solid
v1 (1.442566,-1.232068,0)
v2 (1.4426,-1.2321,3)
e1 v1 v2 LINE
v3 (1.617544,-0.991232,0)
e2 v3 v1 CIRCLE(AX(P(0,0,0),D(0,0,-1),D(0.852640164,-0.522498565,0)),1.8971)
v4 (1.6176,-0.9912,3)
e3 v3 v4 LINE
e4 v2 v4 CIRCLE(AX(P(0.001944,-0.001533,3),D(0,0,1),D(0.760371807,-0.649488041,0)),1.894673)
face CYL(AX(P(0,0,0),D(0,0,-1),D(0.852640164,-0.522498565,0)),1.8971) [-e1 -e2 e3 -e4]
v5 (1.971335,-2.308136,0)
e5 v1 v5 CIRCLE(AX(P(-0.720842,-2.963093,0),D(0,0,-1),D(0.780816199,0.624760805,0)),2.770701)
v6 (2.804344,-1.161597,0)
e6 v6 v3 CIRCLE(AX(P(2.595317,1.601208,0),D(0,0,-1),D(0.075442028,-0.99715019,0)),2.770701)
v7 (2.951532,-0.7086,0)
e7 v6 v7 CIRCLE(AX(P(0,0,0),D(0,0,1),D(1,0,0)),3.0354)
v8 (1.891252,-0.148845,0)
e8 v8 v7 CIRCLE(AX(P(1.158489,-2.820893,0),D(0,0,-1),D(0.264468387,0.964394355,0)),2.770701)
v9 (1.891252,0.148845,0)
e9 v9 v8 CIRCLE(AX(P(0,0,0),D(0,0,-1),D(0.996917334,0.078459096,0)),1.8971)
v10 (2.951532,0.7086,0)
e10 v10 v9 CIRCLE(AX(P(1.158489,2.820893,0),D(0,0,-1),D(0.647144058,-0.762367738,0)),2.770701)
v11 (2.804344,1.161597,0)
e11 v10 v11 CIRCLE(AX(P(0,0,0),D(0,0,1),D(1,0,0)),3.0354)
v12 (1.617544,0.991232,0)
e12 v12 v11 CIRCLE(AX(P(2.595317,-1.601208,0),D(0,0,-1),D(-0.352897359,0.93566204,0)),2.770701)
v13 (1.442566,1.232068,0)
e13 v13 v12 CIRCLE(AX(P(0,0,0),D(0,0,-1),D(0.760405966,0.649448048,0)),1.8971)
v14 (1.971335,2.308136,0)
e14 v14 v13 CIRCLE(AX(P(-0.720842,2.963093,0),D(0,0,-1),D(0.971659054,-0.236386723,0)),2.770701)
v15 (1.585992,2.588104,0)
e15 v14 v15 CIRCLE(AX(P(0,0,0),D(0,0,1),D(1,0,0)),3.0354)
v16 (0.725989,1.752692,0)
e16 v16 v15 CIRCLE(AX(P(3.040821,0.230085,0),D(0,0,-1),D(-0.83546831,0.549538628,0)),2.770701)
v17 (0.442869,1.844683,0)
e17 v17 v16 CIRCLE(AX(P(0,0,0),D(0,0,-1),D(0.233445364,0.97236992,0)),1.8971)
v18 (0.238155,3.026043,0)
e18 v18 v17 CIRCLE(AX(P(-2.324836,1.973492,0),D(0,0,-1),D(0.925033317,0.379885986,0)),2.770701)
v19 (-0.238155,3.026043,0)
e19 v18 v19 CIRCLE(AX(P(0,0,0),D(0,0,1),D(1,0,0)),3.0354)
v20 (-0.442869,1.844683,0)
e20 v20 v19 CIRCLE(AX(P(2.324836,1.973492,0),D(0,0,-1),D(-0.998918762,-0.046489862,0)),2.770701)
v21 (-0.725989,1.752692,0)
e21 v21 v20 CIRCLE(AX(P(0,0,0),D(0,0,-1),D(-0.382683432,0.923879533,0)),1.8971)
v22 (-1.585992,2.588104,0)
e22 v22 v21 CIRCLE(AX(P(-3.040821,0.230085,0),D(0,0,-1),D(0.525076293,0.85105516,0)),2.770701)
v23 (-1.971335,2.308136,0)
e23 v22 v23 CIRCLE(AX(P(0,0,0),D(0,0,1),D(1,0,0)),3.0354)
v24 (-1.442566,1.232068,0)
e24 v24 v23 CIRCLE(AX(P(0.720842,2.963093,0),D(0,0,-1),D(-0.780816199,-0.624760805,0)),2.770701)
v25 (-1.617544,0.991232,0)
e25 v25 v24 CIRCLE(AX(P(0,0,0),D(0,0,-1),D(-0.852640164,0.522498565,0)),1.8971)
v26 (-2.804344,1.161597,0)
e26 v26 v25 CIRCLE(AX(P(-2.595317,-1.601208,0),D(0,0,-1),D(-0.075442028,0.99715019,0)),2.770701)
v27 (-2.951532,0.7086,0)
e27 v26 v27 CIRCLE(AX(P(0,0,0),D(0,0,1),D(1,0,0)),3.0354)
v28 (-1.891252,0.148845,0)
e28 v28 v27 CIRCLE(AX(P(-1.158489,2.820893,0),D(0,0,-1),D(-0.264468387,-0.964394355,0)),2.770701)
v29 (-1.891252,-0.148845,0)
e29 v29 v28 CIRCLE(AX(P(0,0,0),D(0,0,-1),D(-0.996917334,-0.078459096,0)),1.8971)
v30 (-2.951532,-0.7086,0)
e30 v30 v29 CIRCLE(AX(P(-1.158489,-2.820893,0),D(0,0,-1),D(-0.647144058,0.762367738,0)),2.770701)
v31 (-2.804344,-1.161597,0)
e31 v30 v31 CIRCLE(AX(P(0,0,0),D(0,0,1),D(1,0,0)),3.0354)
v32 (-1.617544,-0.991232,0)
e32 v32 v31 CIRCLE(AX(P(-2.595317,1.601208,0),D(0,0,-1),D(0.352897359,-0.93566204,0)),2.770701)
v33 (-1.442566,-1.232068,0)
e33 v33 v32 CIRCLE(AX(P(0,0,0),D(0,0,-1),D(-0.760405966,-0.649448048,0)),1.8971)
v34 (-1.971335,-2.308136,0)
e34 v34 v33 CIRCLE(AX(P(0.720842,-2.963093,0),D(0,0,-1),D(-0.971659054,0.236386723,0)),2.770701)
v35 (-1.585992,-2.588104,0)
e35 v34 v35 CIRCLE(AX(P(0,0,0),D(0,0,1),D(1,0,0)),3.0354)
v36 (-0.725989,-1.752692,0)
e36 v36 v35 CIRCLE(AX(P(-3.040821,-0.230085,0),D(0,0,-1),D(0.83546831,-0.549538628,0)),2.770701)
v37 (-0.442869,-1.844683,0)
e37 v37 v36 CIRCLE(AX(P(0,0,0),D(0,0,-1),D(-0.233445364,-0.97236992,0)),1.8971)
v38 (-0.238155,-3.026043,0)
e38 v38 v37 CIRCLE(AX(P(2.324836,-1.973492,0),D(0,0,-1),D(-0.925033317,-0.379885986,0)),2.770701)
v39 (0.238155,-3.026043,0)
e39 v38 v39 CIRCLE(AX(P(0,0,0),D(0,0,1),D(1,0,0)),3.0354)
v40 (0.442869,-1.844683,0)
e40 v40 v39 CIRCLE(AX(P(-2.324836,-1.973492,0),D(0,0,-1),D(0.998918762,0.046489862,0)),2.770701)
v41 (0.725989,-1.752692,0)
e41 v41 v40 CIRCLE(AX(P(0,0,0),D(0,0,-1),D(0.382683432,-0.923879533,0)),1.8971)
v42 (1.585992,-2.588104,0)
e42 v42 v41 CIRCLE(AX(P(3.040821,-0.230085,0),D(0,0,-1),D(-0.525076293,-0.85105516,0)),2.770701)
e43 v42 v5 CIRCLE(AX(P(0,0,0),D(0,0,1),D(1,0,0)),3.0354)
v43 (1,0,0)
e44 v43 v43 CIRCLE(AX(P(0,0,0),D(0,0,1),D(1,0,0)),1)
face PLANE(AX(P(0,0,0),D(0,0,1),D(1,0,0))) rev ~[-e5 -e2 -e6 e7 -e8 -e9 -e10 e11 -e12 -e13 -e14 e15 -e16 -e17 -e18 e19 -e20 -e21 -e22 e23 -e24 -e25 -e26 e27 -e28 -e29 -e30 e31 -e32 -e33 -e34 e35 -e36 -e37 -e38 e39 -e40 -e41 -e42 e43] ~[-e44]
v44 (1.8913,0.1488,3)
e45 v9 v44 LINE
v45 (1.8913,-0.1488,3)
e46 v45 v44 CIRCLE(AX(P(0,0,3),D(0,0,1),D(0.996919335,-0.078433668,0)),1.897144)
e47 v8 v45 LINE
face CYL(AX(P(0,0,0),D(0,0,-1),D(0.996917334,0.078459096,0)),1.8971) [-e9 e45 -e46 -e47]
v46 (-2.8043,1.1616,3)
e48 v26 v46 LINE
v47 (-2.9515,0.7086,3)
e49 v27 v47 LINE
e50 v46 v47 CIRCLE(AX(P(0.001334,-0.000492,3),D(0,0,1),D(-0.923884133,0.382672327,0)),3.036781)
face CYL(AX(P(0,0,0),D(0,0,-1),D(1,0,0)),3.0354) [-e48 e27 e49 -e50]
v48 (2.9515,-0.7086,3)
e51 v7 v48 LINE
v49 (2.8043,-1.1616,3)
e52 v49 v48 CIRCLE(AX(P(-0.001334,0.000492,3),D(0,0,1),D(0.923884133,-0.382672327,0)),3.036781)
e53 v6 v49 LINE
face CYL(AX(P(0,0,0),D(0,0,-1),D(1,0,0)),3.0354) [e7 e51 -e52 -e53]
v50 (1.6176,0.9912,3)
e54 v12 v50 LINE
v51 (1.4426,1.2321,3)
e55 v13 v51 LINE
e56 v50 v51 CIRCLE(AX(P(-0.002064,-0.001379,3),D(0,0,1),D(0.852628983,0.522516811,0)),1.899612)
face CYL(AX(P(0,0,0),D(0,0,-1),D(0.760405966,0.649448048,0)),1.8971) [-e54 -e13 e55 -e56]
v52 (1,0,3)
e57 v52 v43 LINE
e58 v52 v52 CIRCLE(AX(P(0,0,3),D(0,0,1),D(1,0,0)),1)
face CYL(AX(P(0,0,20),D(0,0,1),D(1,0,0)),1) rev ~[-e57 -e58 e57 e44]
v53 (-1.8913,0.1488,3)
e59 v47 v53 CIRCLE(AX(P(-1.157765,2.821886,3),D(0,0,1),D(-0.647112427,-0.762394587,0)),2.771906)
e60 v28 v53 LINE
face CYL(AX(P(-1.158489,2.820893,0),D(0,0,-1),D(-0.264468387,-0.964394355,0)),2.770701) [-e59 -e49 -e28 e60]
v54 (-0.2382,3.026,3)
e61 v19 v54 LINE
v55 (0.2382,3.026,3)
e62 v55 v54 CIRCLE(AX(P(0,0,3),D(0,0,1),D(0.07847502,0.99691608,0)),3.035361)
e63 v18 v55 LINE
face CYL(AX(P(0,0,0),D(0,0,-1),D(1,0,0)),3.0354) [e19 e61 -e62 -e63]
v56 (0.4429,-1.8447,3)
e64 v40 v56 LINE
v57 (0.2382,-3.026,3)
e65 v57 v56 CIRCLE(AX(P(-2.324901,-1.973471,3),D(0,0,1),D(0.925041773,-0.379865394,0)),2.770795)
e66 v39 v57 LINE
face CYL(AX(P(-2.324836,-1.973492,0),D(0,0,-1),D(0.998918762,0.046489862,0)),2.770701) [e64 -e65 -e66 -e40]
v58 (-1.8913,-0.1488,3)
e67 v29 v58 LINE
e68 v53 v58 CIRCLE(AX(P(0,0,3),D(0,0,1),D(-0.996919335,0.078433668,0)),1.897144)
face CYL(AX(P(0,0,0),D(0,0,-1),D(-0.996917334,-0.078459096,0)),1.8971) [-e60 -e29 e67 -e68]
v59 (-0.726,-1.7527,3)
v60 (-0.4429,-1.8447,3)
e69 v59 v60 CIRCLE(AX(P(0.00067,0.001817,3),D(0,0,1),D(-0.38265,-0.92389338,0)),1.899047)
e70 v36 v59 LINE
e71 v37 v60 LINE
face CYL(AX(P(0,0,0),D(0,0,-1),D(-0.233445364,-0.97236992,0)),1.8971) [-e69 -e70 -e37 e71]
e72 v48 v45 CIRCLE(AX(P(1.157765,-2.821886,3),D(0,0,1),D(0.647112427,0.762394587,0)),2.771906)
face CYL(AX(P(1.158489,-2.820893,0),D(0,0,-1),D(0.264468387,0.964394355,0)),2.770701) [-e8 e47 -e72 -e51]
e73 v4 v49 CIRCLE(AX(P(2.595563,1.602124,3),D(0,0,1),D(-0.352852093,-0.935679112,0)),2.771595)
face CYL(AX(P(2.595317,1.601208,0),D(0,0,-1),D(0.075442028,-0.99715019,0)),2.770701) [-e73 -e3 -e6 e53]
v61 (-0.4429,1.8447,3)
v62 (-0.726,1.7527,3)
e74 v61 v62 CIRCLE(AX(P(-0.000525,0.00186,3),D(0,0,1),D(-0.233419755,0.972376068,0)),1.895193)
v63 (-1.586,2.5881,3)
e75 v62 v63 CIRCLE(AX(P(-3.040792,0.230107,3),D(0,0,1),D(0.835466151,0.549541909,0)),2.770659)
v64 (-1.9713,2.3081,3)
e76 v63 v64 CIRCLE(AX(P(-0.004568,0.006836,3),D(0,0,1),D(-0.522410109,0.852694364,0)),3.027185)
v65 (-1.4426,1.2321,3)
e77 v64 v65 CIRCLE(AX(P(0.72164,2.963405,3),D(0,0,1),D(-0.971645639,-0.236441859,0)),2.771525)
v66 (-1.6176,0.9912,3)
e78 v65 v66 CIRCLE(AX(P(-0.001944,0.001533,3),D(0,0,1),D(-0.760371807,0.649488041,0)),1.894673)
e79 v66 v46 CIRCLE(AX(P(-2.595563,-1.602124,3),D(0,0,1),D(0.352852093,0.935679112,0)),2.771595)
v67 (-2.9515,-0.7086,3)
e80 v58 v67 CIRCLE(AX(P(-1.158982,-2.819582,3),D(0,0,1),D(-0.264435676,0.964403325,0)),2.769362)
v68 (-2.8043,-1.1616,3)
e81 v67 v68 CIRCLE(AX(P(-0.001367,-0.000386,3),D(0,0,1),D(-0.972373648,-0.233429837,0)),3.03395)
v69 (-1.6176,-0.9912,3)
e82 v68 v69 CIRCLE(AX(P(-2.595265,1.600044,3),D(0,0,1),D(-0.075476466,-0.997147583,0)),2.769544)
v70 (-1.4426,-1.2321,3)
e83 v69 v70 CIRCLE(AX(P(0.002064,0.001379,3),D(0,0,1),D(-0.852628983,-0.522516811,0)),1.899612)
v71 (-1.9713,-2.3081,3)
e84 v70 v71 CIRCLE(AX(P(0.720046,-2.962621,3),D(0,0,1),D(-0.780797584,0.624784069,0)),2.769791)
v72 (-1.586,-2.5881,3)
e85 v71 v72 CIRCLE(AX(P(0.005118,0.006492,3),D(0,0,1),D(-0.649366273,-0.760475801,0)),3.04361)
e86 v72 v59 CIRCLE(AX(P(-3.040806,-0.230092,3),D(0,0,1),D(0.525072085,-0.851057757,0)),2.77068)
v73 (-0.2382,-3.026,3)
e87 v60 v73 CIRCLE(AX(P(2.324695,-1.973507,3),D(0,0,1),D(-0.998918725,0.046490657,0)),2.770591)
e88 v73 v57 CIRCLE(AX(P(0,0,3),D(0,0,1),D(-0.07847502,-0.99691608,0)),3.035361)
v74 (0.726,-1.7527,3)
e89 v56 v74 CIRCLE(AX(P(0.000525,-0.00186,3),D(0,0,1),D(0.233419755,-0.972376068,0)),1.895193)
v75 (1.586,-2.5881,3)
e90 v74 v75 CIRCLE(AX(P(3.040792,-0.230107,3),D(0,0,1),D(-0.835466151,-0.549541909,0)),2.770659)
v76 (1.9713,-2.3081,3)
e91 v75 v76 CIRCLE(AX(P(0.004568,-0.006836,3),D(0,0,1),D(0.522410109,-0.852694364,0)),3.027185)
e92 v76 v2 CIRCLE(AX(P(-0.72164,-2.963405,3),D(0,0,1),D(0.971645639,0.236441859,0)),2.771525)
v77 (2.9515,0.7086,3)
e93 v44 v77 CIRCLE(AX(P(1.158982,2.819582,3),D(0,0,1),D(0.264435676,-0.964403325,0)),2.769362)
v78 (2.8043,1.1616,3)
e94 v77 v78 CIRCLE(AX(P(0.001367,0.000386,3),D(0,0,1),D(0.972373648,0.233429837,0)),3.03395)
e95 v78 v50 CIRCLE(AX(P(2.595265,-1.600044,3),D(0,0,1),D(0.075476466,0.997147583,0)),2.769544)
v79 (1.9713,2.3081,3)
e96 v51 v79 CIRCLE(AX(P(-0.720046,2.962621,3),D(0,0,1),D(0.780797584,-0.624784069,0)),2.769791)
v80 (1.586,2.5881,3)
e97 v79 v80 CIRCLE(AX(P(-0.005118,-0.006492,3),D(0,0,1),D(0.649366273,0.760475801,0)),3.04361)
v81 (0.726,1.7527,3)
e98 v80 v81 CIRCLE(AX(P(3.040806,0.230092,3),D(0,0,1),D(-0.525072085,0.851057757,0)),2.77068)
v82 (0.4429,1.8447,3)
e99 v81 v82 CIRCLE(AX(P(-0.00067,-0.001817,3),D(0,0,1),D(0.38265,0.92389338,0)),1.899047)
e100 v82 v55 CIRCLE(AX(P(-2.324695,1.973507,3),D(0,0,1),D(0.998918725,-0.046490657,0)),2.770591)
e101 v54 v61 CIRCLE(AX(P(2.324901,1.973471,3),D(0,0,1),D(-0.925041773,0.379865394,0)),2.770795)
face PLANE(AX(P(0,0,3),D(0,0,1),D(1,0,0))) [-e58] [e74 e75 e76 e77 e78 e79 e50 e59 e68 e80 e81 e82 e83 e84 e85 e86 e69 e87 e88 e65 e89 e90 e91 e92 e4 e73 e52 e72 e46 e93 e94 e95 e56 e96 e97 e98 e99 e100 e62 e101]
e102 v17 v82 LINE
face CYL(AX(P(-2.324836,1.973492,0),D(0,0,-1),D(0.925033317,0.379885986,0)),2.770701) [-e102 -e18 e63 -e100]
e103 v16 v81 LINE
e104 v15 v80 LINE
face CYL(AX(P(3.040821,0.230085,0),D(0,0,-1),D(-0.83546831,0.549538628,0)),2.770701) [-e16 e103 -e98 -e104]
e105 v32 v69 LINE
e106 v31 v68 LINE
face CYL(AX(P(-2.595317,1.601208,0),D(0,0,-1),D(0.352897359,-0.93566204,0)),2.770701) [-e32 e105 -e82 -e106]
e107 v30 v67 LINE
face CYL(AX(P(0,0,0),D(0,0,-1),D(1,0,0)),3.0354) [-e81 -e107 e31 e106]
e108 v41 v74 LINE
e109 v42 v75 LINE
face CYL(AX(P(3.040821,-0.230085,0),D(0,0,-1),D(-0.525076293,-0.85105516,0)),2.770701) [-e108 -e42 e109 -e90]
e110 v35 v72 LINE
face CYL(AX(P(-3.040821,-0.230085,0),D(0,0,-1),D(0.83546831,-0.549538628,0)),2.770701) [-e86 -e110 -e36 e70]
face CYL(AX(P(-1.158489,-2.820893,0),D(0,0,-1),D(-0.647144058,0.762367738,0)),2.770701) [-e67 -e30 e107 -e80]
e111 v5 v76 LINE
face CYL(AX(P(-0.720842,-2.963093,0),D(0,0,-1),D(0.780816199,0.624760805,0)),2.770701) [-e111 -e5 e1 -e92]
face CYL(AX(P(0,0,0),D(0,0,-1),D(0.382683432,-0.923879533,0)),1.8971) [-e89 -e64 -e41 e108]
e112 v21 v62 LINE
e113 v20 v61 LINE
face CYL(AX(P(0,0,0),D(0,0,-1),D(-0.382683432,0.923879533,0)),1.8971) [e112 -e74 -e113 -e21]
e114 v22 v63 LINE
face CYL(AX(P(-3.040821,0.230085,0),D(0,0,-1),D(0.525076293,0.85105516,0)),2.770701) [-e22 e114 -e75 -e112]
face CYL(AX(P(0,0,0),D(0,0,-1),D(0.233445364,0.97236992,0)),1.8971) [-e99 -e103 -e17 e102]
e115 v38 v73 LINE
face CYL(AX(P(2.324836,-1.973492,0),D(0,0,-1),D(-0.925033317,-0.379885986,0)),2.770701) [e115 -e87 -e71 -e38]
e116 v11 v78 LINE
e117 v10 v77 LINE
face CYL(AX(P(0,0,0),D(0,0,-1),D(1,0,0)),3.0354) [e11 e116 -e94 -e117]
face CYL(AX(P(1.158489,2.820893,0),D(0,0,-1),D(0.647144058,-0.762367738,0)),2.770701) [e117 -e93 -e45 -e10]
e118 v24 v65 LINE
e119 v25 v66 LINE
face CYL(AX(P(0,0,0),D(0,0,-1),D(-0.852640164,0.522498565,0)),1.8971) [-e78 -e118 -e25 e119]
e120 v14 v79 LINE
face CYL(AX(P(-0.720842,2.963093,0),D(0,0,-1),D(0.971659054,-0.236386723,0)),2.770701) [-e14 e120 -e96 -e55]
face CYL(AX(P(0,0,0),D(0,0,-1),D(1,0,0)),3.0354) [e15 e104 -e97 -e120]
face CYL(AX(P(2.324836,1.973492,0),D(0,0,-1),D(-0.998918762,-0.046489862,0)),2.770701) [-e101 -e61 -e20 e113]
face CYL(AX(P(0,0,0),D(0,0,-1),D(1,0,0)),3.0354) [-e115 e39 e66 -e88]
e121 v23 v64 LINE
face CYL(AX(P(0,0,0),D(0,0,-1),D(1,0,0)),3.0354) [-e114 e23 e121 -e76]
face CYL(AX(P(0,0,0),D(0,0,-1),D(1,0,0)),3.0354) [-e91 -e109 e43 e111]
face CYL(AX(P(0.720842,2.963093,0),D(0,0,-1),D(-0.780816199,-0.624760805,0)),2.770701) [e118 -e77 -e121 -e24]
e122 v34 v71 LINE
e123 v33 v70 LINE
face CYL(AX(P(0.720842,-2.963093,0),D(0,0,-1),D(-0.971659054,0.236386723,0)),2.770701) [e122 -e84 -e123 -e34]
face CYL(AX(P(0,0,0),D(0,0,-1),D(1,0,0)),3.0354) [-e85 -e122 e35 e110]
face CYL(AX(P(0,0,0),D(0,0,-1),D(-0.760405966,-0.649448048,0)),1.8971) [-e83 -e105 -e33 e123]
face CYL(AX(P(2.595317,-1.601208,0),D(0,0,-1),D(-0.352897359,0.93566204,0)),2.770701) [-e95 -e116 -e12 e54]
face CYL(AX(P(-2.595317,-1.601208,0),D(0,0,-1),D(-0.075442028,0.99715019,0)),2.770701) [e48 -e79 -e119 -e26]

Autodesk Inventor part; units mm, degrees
sketch "Sketch1" plane through (0, 0, 0) normal (0, 0, 1) x (1, 0, 0)
  circle A0 centre (0, 0) radius 3.0354
  dimension "d0" = 6.0708
extrude "Extrusion1" add sketch "Sketch1" along normal blind 20
ref_plane "Work Plane2" through (0, 0, 10) normal (0, 0, 1) x (1, 0, 0)
sketch "Sketch2" plane through (0, 0, 0) normal (0, 0, -1) x (-1, 0, 0)
  circle A0 centre (0, 0) radius 3.0354 projected
  circle A1 centre (0, 0) radius 2.5295
  dimension "d3" = 5.059
surface extrude "Pitch Diameter" sketch "Sketch2" against normal through all shown no curves A1
ref_plane "Work Plane8" through (0, 0, 0) normal (0.9510565, 0.309017, 0) x (0, 0, 1)
ref_plane "Work Plane9" through (0, 0, 0) normal (1, 0, 0) x (0, 1, 0)
spur gear teeth "Spur Gear" teeth 10 pitch diameter 5.059 tip diameter 6.0708 root diameter 3.7942 face width 20 start plane through (0, 0, 0) normal (0, 0, -1) x (-1, 0, 0)
sketch "Sketch3" plane through (0, 0, 20) normal (0, 0, 1) x (1, 0, 0)
  arc A0 (-1.9713, 2.3081) -> (-1.4426, 1.2321) centre (0.7208, 2.9631) ccw projected
  arc A1 (-1.4426, 1.2321) -> (-1.6176, 0.9912) centre (0, 0) ccw projected
  arc A2 (-1.6176, 0.9912) -> (-2.8043, 1.1616) centre (-2.5953, -1.6011) ccw projected
  arc A3 (-2.8043, 1.1616) -> (-2.9515, 0.7086) centre (0, 0) ccw projected
  arc A4 (-2.9515, 0.7086) -> (-1.8913, 0.1488) centre (-1.1585, 2.8208) ccw projected
  arc A5 (-1.8913, 0.1488) -> (-1.8913, -0.1488) centre (0, 0) ccw projected
  arc A6 (-1.8913, -0.1488) -> (-2.9515, -0.7086) centre (-1.1585, -2.8208) ccw projected
  arc A7 (-2.9515, -0.7086) -> (-2.8043, -1.1616) centre (0, 0) ccw projected
  arc A8 (-2.8043, -1.1616) -> (-1.6176, -0.9912) centre (-2.5953, 1.6011) ccw projected
  arc A9 (-1.6176, -0.9912) -> (-1.4426, -1.2321) centre (0, 0) ccw projected
  arc A10 (-1.4426, -1.2321) -> (-1.9713, -2.3081) centre (0.7208, -2.9631) ccw projected
  arc A11 (-1.9713, -2.3081) -> (-1.586, -2.5881) centre (0, 0) ccw projected
  arc A12 (-1.586, -2.5881) -> (-0.726, -1.7527) centre (-3.0408, -0.2301) ccw projected
  arc A13 (-0.726, -1.7527) -> (-0.4429, -1.8447) centre (0, 0) ccw projected
  arc A14 (-0.4429, -1.8447) -> (-0.2382, -3.026) centre (2.3248, -1.9735) ccw projected
  arc A15 (-0.2382, -3.026) -> (0.2382, -3.026) centre (0, 0) ccw projected
  arc A16 (0.2382, -3.026) -> (0.4429, -1.8447) centre (-2.3248, -1.9735) ccw projected
  arc A17 (0.4429, -1.8447) -> (0.726, -1.7527) centre (0, 0) ccw projected
  arc A18 (0.726, -1.7527) -> (1.586, -2.5881) centre (3.0408, -0.2301) ccw projected
  arc A19 (1.586, -2.5881) -> (1.9713, -2.3081) centre (0, 0) ccw projected
  arc A20 (1.9713, -2.3081) -> (1.4426, -1.2321) centre (-0.7208, -2.9631) ccw projected
  arc A21 (1.4426, -1.2321) -> (1.6176, -0.9912) centre (0, 0) ccw projected
  arc A22 (1.6176, -0.9912) -> (2.8043, -1.1616) centre (2.5953, 1.6011) ccw projected
  arc A23 (2.8043, -1.1616) -> (2.9515, -0.7086) centre (0, 0) ccw projected
  arc A24 (2.9515, -0.7086) -> (1.8913, -0.1488) centre (1.1585, -2.8208) ccw projected
  arc A25 (1.8913, -0.1488) -> (1.8913, 0.1488) centre (0, 0) ccw projected
  arc A26 (1.8913, 0.1488) -> (2.9515, 0.7086) centre (1.1585, 2.8208) ccw projected
  arc A27 (2.9515, 0.7086) -> (2.8043, 1.1616) centre (0, 0) ccw projected
  arc A28 (2.8043, 1.1616) -> (1.6176, 0.9912) centre (2.5953, -1.6011) ccw projected
  arc A29 (1.6176, 0.9912) -> (1.4426, 1.2321) centre (0, 0) ccw projected
  arc A30 (1.4426, 1.2321) -> (1.9713, 2.3081) centre (-0.7208, 2.9631) ccw projected
  arc A31 (1.9713, 2.3081) -> (1.586, 2.5881) centre (0, 0) ccw projected
  arc A32 (1.586, 2.5881) -> (0.726, 1.7527) centre (3.0408, 0.2301) ccw projected
  arc A33 (0.726, 1.7527) -> (0.4429, 1.8447) centre (0, 0) ccw projected
  arc A34 (0.4429, 1.8447) -> (0.2382, 3.026) centre (-2.3248, 1.9735) ccw projected
  arc A35 (0.2382, 3.026) -> (-0.2382, 3.026) centre (0, 0) ccw projected
  arc A36 (-0.2382, 3.026) -> (-0.4429, 1.8447) centre (2.3248, 1.9735) ccw projected
  arc A37 (-0.4429, 1.8447) -> (-0.726, 1.7527) centre (0, 0) ccw projected
  arc A38 (-0.726, 1.7527) -> (-1.586, 2.5881) centre (-3.0408, 0.2301) ccw projected
  arc A39 (-1.586, 2.5881) -> (-1.9713, 2.3081) centre (0, 0) ccw projected
  circle A40 centre (0, 0) radius 1
  dimension "d49" = 2
ref_plane "Work Plane11" through (-4.7906, 1.2372, 4) normal (0, 0, 1) x (0.9749279, -0.2225209, 0)
extrude "Extrusion2" cut sketch "Sketch3" against normal up to surface (16 mm away) contours A39 A38 A37 A36 A35 A34 A33 A32 A31 A30 A29 A28 A27 A26 A25 A24 A23 A22 A21 A20 A19 A18 A17 A16 A15 A14 A13 A12 A11 A10 A9 A8 A7 A6 A5 A4 A3 A2 A1 A0 | A40
extrude "Extrusion3" cut sketch "Sketch3" against normal through all contours A40
sketch "Sketch4" plane through (0, 0, 4) normal (0, 0, 1) x (1, 0, 0)
  circle A0 centre (0, 0) radius 1 projected
  arc A1 (-1.6176, 0.9912) -> (-2.8043, 1.1616) centre (-2.5953, -1.6011) ccw projected
  arc A2 (-2.8043, 1.1616) -> (-2.9515, 0.7086) centre (0, 0) ccw projected
  arc A3 (-2.9515, 0.7086) -> (-1.8913, 0.1488) centre (-1.1585, 2.8208) ccw projected
  arc A4 (-1.8913, 0.1488) -> (-1.8913, -0.1488) centre (0, 0) ccw projected
  arc A5 (-1.8913, -0.1488) -> (-2.9515, -0.7086) centre (-1.1585, -2.8208) ccw projected
  arc A6 (-2.9515, -0.7086) -> (-2.8043, -1.1616) centre (0, 0) ccw projected
  arc A7 (-2.8043, -1.1616) -> (-1.6176, -0.9912) centre (-2.5953, 1.6011) ccw projected
  arc A8 (-1.6176, -0.9912) -> (-1.4426, -1.2321) centre (0, 0) ccw projected
  arc A9 (-1.4426, -1.2321) -> (-1.9713, -2.3081) centre (0.7208, -2.9631) ccw projected
  arc A10 (-1.9713, -2.3081) -> (-1.586, -2.5881) centre (0, 0) ccw projected
  arc A11 (-1.586, -2.5881) -> (-0.726, -1.7527) centre (-3.0408, -0.2301) ccw projected
  arc A12 (-0.726, -1.7527) -> (-0.4429, -1.8447) centre (0, 0) ccw projected
  arc A13 (-0.4429, -1.8447) -> (-0.2382, -3.026) centre (2.3248, -1.9735) ccw projected
  arc A14 (-0.2382, -3.026) -> (0.2382, -3.026) centre (0, 0) ccw projected
  arc A15 (0.2382, -3.026) -> (0.4429, -1.8447) centre (-2.3248, -1.9735) ccw projected
  arc A16 (0.4429, -1.8447) -> (0.726, -1.7527) centre (0, 0) ccw projected
  arc A17 (0.726, -1.7527) -> (1.586, -2.5881) centre (3.0408, -0.2301) ccw projected
  arc A18 (1.586, -2.5881) -> (1.9713, -2.3081) centre (0, 0) ccw projected
  arc A19 (1.9713, -2.3081) -> (1.4426, -1.2321) centre (-0.7208, -2.9631) ccw projected
  arc A20 (1.4426, -1.2321) -> (1.6176, -0.9912) centre (0, 0) ccw projected
  arc A21 (1.6176, -0.9912) -> (2.8043, -1.1616) centre (2.5953, 1.6011) ccw projected
  arc A22 (2.8043, -1.1616) -> (2.9515, -0.7086) centre (0, 0) ccw projected
  arc A23 (2.9515, -0.7086) -> (1.8913, -0.1488) centre (1.1585, -2.8208) ccw projected
  arc A24 (1.8913, -0.1488) -> (1.8913, 0.1488) centre (0, 0) ccw projected
  arc A25 (1.8913, 0.1488) -> (2.9515, 0.7086) centre (1.1585, 2.8208) ccw projected
  arc A26 (2.9515, 0.7086) -> (2.8043, 1.1616) centre (0, 0) ccw projected
  arc A27 (2.8043, 1.1616) -> (1.6176, 0.9912) centre (2.5953, -1.6011) ccw projected
  arc A28 (1.6176, 0.9912) -> (1.4426, 1.2321) centre (0, 0) ccw projected
  arc A29 (1.4426, 1.2321) -> (1.9713, 2.3081) centre (-0.7208, 2.9631) ccw projected
  arc A30 (1.9713, 2.3081) -> (1.586, 2.5881) centre (0, 0) ccw projected
  arc A31 (1.586, 2.5881) -> (0.726, 1.7527) centre (3.0408, 0.2301) ccw projected
  arc A32 (0.726, 1.7527) -> (0.4429, 1.8447) centre (0, 0) ccw projected
  arc A33 (0.4429, 1.8447) -> (0.2382, 3.026) centre (-2.3248, 1.9735) ccw projected
  arc A34 (0.2382, 3.026) -> (-0.2382, 3.026) centre (0, 0) ccw projected
  arc A35 (-0.2382, 3.026) -> (-0.4429, 1.8447) centre (2.3248, 1.9735) ccw projected
  arc A36 (-0.4429, 1.8447) -> (-0.726, 1.7527) centre (0, 0) ccw projected
  arc A37 (-0.726, 1.7527) -> (-1.586, 2.5881) centre (-3.0408, 0.2301) ccw projected
  arc A38 (-1.586, 2.5881) -> (-1.9713, 2.3081) centre (0, 0) ccw projected
  arc A39 (-1.9713, 2.3081) -> (-1.4426, 1.2321) centre (0.7208, 2.9631) ccw projected
  arc A40 (-1.4426, 1.2321) -> (-1.6176, 0.9912) centre (0, 0) ccw projected
extrude "Extrusion4" cut sketch "Sketch4" against normal blind 1
equation "\"d0\" = da_da"
equation "\"d1\" = da_b"
equation "\"d3\" = da_d"
equation "\"d16\" = da_aw"
equation "\"d43\" = da_aw"
equation "\"d46\" = da_aw"
equation "\"da_da\" = 6.0708"
equation "\"da_b\" = 20"
equation "\"da_d\" = 5.059"
equation "\"da_aw\" = 6.0708"
properties part number "Spur Gear1" material "Steel"
